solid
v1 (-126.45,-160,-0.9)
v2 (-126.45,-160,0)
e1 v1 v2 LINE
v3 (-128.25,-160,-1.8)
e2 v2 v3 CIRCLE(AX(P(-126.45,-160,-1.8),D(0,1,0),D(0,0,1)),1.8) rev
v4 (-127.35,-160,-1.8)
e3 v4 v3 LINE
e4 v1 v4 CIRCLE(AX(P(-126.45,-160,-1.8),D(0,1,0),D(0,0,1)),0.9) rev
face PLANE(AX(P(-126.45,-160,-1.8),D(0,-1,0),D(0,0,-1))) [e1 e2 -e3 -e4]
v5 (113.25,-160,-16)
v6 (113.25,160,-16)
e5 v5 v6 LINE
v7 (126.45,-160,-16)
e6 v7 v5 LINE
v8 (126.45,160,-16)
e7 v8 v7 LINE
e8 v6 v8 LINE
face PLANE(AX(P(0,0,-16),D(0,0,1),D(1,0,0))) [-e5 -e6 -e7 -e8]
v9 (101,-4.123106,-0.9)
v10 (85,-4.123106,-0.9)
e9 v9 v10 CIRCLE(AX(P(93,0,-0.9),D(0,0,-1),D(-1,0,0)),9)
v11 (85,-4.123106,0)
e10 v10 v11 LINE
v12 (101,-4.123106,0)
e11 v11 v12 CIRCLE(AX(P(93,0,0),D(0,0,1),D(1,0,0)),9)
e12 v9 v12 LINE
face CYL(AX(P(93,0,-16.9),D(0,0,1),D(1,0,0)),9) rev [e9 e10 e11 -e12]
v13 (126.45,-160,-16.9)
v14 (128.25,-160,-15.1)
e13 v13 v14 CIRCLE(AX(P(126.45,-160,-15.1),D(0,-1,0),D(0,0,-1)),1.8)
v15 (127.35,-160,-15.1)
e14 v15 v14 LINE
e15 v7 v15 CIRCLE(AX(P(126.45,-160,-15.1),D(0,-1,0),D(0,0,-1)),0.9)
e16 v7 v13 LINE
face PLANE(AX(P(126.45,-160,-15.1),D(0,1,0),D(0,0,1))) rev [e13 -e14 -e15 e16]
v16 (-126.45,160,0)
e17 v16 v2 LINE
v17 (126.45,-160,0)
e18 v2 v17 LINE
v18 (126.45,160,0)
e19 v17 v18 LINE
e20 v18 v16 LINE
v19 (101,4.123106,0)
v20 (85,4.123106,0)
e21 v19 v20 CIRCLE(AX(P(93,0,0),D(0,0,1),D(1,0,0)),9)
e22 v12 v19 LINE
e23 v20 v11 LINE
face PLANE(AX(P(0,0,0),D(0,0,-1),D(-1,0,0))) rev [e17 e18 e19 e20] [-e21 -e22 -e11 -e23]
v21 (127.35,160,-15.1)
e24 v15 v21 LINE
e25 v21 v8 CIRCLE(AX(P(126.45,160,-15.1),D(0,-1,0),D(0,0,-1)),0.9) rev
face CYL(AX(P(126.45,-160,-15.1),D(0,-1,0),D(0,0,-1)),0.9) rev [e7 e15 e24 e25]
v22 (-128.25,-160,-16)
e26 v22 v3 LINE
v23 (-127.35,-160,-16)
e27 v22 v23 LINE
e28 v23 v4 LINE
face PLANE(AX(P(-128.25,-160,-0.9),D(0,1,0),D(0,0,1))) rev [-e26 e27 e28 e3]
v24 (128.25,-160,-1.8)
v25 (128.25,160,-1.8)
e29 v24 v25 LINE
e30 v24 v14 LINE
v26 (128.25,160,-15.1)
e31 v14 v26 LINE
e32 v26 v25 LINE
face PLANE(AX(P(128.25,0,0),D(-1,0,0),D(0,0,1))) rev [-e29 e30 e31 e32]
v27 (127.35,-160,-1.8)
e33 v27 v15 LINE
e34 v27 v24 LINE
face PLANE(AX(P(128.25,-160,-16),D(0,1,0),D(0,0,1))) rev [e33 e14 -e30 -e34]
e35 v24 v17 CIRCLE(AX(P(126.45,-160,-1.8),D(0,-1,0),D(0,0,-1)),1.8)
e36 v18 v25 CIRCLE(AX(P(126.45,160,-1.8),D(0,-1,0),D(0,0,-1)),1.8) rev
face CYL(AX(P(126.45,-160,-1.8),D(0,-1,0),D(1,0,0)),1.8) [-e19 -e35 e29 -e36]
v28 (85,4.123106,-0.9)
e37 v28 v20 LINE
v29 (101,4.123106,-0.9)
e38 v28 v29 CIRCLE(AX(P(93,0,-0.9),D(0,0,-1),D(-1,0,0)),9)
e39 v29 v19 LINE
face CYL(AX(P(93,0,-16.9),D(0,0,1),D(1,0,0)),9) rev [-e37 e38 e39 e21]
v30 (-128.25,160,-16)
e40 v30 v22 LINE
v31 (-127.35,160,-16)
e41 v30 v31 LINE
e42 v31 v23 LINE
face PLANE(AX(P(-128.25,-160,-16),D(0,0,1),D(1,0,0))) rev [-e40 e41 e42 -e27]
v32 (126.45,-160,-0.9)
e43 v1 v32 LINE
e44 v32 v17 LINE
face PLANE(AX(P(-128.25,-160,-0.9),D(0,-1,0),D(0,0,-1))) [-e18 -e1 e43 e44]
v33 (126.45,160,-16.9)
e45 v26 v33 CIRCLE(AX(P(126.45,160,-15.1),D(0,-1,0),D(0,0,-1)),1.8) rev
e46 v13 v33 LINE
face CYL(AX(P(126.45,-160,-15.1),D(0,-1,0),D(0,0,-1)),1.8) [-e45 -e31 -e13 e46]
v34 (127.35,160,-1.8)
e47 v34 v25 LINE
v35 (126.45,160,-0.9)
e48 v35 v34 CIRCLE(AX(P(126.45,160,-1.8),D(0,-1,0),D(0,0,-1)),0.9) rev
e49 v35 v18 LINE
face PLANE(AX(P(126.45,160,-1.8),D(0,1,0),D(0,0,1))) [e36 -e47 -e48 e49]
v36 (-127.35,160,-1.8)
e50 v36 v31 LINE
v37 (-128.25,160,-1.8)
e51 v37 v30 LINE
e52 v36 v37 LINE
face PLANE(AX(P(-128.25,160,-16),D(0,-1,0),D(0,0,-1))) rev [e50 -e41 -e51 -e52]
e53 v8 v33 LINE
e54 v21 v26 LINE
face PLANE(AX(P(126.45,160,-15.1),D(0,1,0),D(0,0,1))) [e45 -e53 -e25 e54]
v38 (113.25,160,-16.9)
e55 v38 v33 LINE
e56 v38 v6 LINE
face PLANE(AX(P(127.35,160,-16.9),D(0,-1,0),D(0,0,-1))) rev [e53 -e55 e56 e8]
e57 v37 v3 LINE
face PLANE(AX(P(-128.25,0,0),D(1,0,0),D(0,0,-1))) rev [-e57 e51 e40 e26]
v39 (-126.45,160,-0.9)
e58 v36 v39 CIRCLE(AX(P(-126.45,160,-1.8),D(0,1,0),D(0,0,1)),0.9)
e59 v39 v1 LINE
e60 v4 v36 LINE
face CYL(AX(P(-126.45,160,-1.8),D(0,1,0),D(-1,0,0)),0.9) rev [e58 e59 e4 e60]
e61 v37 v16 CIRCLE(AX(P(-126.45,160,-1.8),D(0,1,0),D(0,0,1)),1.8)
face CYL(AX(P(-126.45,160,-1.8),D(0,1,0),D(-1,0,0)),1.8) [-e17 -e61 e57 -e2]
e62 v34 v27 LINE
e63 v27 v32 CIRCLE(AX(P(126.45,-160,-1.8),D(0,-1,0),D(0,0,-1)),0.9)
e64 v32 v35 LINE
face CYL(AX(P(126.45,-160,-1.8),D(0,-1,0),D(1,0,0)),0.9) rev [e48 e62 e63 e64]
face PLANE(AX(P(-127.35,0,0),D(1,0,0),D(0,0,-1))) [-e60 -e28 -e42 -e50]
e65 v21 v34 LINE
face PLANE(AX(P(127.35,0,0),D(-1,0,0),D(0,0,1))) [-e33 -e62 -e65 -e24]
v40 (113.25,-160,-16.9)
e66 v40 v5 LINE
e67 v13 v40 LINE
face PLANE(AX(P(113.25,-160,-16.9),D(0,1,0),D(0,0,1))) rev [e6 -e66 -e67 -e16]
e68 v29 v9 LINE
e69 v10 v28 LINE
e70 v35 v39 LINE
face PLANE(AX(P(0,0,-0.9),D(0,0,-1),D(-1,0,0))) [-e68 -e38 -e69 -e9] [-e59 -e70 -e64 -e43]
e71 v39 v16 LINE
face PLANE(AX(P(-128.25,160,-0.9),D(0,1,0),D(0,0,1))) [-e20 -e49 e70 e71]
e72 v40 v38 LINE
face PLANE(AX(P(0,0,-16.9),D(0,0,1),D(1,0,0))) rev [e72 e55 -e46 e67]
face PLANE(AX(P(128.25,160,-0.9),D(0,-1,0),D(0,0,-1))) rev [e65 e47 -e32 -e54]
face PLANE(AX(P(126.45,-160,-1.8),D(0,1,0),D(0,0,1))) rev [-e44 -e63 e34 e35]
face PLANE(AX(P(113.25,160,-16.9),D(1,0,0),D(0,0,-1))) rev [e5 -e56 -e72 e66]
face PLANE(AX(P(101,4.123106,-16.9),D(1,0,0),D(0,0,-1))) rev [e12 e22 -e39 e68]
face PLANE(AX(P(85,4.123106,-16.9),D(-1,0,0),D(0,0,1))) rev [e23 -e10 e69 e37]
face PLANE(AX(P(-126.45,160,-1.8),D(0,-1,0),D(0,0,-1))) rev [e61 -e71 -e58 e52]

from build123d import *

# Parameters (mm, degrees)
SKETCH1_W                      = 256.5
SKETCH1_H                      = 320
BASE_FLANGE1_DEPTH             = 0.9
EDGE_FLANGE1_STRIP_W           = 5.4
EDGE_FLANGE1_STRIP_H           = 0.9
EDGE_FLANGE1_STRIP_CUT_DEPTH   = 320
EDGE_FLANGE1_STRIP_2_W         = 5.4
EDGE_FLANGE1_STRIP_2_H         = 0.9
EDGE_FLANGE1_STRIP_CUT_2_DEPTH = 320
EDGE_FLANGE1_DEPTH             = 320
EDGE_FLANGE1_BEND_DEPTH        = 320
EDGE_FLANGE2_STRIP_W           = 5.4
EDGE_FLANGE2_STRIP_H           = 0.9
EDGE_FLANGE2_STRIP_CUT_DEPTH   = 320
EDGE_FLANGE2_DEPTH             = 320
CUT_EXTRUDE1_DEPTH             = 206.751482376


# Sheet-metal steps are written as plain solids
with BuildPart() as part:
    # Sketch1 → Base-Flange1 (new body)
    with BuildSketch(Plane.XY):
        Rectangle(SKETCH1_W, SKETCH1_H)
    extrude(amount=-BASE_FLANGE1_DEPTH)

    # Edge-Flange1 strip (across the edge) → Edge-Flange1 strip cut (cut)
    with BuildSketch(Plane(origin=(128.25, 160, -0.9), x_dir=(-1, 0, 0), z_dir=(0, -1, 0))):
        with Locations((-0.9, -0.45)):
            Rectangle(EDGE_FLANGE1_STRIP_W, EDGE_FLANGE1_STRIP_H)
    extrude(amount=EDGE_FLANGE1_STRIP_CUT_DEPTH, mode=Mode.SUBTRACT)

    # Edge-Flange1 strip 2 (across the edge) → Edge-Flange1 strip cut 2 (cut)
    with BuildSketch(Plane(origin=(-128.25, -160, -0.9), x_dir=(1, 0, 0), z_dir=(0, 1, 0))):
        with Locations((-0.9, -0.45)):
            Rectangle(EDGE_FLANGE1_STRIP_2_W, EDGE_FLANGE1_STRIP_2_H)
    extrude(amount=EDGE_FLANGE1_STRIP_CUT_2_DEPTH, mode=Mode.SUBTRACT)

    # Edge-Flange1 section (across the edge) → Edge-Flange1 (add)
    with BuildSketch(Plane(origin=(128.25, 160, -0.9), x_dir=(-1, 0, 0), z_dir=(0, -1, 0))):
        with BuildLine():
            Line((0, 0.9), (0, 15.1))
            Line((0, 15.1), (0.9, 15.1))
            Line((0.9, 15.1), (0.9, 0.9))
            ThreePointArc((0.9, 0.9), (1.163603897, 0.263603897), (1.8, 0))
            Line((1.8, 0), (1.8, -0.9))
            ThreePointArc((1.8, -0.9), (0.527207794, -0.372792206), (0, 0.9))
        make_face()
    extrude(amount=EDGE_FLANGE1_DEPTH)

    # Edge-Flange1 section 2 (across the edge) → Edge-Flange1 bend (add)
    with BuildSketch(Plane(origin=(-128.25, -160, -0.9), x_dir=(1, 0, 0), z_dir=(0, 1, 0))):
        with BuildLine():
            Line((0, 0.9), (0, 15.1))
            Line((0, 15.1), (0.9, 15.1))
            Line((0.9, 15.1), (0.9, 0.9))
            ThreePointArc((0.9, 0.9), (1.163603897, 0.263603897), (1.8, 0))
            Line((1.8, 0), (1.8, -0.9))
            ThreePointArc((1.8, -0.9), (0.527207794, -0.372792206), (0, 0.9))
        make_face()
    extrude(amount=EDGE_FLANGE1_BEND_DEPTH)

    # Edge-Flange2 strip (across the edge) → Edge-Flange2 strip cut (cut)
    with BuildSketch(Plane(origin=(127.35, 160, -16), x_dir=(0, 0, 1), z_dir=(0, -1, 0))):
        with Locations((-1.8, -0.45)):
            Rectangle(EDGE_FLANGE2_STRIP_W, EDGE_FLANGE2_STRIP_H)
    extrude(amount=EDGE_FLANGE2_STRIP_CUT_DEPTH, mode=Mode.SUBTRACT)

    # Edge-Flange2 section (across the edge) → Edge-Flange2 (add)
    with BuildSketch(Plane(origin=(127.35, 160, -16), x_dir=(0, 0, 1), z_dir=(0, -1, 0))):
        with BuildLine():
            Line((-0.9, 0.9), (-0.9, 14.1))
            Line((-0.9, 14.1), (0, 14.1))
            Line((0, 14.1), (0, 0.9))
            ThreePointArc((0, 0.9), (0.263603897, 0.263603897), (0.9, 0))
            Line((0.9, 0), (0.9, -0.9))
            ThreePointArc((0.9, -0.9), (-0.372792206, -0.372792206), (-0.9, 0.9))
        make_face()
    extrude(amount=EDGE_FLANGE2_DEPTH)

    # Sketch24 → Cut-Extrude1 (cut, through all)
    with BuildSketch(Plane.XY):
        with BuildLine():
            Line((101, 4.123105626), (101, -4.123105626))
            ThreePointArc((101, -4.123105626), (93, -9), (85, -4.123105626))
            Line((85, -4.123105626), (85, 4.123105626))
            ThreePointArc((85, 4.123105626), (93, 9), (101, 4.123105626))
        make_face()
    extrude(amount=-CUT_EXTRUDE1_DEPTH, mode=Mode.SUBTRACT)


solid = part.part
